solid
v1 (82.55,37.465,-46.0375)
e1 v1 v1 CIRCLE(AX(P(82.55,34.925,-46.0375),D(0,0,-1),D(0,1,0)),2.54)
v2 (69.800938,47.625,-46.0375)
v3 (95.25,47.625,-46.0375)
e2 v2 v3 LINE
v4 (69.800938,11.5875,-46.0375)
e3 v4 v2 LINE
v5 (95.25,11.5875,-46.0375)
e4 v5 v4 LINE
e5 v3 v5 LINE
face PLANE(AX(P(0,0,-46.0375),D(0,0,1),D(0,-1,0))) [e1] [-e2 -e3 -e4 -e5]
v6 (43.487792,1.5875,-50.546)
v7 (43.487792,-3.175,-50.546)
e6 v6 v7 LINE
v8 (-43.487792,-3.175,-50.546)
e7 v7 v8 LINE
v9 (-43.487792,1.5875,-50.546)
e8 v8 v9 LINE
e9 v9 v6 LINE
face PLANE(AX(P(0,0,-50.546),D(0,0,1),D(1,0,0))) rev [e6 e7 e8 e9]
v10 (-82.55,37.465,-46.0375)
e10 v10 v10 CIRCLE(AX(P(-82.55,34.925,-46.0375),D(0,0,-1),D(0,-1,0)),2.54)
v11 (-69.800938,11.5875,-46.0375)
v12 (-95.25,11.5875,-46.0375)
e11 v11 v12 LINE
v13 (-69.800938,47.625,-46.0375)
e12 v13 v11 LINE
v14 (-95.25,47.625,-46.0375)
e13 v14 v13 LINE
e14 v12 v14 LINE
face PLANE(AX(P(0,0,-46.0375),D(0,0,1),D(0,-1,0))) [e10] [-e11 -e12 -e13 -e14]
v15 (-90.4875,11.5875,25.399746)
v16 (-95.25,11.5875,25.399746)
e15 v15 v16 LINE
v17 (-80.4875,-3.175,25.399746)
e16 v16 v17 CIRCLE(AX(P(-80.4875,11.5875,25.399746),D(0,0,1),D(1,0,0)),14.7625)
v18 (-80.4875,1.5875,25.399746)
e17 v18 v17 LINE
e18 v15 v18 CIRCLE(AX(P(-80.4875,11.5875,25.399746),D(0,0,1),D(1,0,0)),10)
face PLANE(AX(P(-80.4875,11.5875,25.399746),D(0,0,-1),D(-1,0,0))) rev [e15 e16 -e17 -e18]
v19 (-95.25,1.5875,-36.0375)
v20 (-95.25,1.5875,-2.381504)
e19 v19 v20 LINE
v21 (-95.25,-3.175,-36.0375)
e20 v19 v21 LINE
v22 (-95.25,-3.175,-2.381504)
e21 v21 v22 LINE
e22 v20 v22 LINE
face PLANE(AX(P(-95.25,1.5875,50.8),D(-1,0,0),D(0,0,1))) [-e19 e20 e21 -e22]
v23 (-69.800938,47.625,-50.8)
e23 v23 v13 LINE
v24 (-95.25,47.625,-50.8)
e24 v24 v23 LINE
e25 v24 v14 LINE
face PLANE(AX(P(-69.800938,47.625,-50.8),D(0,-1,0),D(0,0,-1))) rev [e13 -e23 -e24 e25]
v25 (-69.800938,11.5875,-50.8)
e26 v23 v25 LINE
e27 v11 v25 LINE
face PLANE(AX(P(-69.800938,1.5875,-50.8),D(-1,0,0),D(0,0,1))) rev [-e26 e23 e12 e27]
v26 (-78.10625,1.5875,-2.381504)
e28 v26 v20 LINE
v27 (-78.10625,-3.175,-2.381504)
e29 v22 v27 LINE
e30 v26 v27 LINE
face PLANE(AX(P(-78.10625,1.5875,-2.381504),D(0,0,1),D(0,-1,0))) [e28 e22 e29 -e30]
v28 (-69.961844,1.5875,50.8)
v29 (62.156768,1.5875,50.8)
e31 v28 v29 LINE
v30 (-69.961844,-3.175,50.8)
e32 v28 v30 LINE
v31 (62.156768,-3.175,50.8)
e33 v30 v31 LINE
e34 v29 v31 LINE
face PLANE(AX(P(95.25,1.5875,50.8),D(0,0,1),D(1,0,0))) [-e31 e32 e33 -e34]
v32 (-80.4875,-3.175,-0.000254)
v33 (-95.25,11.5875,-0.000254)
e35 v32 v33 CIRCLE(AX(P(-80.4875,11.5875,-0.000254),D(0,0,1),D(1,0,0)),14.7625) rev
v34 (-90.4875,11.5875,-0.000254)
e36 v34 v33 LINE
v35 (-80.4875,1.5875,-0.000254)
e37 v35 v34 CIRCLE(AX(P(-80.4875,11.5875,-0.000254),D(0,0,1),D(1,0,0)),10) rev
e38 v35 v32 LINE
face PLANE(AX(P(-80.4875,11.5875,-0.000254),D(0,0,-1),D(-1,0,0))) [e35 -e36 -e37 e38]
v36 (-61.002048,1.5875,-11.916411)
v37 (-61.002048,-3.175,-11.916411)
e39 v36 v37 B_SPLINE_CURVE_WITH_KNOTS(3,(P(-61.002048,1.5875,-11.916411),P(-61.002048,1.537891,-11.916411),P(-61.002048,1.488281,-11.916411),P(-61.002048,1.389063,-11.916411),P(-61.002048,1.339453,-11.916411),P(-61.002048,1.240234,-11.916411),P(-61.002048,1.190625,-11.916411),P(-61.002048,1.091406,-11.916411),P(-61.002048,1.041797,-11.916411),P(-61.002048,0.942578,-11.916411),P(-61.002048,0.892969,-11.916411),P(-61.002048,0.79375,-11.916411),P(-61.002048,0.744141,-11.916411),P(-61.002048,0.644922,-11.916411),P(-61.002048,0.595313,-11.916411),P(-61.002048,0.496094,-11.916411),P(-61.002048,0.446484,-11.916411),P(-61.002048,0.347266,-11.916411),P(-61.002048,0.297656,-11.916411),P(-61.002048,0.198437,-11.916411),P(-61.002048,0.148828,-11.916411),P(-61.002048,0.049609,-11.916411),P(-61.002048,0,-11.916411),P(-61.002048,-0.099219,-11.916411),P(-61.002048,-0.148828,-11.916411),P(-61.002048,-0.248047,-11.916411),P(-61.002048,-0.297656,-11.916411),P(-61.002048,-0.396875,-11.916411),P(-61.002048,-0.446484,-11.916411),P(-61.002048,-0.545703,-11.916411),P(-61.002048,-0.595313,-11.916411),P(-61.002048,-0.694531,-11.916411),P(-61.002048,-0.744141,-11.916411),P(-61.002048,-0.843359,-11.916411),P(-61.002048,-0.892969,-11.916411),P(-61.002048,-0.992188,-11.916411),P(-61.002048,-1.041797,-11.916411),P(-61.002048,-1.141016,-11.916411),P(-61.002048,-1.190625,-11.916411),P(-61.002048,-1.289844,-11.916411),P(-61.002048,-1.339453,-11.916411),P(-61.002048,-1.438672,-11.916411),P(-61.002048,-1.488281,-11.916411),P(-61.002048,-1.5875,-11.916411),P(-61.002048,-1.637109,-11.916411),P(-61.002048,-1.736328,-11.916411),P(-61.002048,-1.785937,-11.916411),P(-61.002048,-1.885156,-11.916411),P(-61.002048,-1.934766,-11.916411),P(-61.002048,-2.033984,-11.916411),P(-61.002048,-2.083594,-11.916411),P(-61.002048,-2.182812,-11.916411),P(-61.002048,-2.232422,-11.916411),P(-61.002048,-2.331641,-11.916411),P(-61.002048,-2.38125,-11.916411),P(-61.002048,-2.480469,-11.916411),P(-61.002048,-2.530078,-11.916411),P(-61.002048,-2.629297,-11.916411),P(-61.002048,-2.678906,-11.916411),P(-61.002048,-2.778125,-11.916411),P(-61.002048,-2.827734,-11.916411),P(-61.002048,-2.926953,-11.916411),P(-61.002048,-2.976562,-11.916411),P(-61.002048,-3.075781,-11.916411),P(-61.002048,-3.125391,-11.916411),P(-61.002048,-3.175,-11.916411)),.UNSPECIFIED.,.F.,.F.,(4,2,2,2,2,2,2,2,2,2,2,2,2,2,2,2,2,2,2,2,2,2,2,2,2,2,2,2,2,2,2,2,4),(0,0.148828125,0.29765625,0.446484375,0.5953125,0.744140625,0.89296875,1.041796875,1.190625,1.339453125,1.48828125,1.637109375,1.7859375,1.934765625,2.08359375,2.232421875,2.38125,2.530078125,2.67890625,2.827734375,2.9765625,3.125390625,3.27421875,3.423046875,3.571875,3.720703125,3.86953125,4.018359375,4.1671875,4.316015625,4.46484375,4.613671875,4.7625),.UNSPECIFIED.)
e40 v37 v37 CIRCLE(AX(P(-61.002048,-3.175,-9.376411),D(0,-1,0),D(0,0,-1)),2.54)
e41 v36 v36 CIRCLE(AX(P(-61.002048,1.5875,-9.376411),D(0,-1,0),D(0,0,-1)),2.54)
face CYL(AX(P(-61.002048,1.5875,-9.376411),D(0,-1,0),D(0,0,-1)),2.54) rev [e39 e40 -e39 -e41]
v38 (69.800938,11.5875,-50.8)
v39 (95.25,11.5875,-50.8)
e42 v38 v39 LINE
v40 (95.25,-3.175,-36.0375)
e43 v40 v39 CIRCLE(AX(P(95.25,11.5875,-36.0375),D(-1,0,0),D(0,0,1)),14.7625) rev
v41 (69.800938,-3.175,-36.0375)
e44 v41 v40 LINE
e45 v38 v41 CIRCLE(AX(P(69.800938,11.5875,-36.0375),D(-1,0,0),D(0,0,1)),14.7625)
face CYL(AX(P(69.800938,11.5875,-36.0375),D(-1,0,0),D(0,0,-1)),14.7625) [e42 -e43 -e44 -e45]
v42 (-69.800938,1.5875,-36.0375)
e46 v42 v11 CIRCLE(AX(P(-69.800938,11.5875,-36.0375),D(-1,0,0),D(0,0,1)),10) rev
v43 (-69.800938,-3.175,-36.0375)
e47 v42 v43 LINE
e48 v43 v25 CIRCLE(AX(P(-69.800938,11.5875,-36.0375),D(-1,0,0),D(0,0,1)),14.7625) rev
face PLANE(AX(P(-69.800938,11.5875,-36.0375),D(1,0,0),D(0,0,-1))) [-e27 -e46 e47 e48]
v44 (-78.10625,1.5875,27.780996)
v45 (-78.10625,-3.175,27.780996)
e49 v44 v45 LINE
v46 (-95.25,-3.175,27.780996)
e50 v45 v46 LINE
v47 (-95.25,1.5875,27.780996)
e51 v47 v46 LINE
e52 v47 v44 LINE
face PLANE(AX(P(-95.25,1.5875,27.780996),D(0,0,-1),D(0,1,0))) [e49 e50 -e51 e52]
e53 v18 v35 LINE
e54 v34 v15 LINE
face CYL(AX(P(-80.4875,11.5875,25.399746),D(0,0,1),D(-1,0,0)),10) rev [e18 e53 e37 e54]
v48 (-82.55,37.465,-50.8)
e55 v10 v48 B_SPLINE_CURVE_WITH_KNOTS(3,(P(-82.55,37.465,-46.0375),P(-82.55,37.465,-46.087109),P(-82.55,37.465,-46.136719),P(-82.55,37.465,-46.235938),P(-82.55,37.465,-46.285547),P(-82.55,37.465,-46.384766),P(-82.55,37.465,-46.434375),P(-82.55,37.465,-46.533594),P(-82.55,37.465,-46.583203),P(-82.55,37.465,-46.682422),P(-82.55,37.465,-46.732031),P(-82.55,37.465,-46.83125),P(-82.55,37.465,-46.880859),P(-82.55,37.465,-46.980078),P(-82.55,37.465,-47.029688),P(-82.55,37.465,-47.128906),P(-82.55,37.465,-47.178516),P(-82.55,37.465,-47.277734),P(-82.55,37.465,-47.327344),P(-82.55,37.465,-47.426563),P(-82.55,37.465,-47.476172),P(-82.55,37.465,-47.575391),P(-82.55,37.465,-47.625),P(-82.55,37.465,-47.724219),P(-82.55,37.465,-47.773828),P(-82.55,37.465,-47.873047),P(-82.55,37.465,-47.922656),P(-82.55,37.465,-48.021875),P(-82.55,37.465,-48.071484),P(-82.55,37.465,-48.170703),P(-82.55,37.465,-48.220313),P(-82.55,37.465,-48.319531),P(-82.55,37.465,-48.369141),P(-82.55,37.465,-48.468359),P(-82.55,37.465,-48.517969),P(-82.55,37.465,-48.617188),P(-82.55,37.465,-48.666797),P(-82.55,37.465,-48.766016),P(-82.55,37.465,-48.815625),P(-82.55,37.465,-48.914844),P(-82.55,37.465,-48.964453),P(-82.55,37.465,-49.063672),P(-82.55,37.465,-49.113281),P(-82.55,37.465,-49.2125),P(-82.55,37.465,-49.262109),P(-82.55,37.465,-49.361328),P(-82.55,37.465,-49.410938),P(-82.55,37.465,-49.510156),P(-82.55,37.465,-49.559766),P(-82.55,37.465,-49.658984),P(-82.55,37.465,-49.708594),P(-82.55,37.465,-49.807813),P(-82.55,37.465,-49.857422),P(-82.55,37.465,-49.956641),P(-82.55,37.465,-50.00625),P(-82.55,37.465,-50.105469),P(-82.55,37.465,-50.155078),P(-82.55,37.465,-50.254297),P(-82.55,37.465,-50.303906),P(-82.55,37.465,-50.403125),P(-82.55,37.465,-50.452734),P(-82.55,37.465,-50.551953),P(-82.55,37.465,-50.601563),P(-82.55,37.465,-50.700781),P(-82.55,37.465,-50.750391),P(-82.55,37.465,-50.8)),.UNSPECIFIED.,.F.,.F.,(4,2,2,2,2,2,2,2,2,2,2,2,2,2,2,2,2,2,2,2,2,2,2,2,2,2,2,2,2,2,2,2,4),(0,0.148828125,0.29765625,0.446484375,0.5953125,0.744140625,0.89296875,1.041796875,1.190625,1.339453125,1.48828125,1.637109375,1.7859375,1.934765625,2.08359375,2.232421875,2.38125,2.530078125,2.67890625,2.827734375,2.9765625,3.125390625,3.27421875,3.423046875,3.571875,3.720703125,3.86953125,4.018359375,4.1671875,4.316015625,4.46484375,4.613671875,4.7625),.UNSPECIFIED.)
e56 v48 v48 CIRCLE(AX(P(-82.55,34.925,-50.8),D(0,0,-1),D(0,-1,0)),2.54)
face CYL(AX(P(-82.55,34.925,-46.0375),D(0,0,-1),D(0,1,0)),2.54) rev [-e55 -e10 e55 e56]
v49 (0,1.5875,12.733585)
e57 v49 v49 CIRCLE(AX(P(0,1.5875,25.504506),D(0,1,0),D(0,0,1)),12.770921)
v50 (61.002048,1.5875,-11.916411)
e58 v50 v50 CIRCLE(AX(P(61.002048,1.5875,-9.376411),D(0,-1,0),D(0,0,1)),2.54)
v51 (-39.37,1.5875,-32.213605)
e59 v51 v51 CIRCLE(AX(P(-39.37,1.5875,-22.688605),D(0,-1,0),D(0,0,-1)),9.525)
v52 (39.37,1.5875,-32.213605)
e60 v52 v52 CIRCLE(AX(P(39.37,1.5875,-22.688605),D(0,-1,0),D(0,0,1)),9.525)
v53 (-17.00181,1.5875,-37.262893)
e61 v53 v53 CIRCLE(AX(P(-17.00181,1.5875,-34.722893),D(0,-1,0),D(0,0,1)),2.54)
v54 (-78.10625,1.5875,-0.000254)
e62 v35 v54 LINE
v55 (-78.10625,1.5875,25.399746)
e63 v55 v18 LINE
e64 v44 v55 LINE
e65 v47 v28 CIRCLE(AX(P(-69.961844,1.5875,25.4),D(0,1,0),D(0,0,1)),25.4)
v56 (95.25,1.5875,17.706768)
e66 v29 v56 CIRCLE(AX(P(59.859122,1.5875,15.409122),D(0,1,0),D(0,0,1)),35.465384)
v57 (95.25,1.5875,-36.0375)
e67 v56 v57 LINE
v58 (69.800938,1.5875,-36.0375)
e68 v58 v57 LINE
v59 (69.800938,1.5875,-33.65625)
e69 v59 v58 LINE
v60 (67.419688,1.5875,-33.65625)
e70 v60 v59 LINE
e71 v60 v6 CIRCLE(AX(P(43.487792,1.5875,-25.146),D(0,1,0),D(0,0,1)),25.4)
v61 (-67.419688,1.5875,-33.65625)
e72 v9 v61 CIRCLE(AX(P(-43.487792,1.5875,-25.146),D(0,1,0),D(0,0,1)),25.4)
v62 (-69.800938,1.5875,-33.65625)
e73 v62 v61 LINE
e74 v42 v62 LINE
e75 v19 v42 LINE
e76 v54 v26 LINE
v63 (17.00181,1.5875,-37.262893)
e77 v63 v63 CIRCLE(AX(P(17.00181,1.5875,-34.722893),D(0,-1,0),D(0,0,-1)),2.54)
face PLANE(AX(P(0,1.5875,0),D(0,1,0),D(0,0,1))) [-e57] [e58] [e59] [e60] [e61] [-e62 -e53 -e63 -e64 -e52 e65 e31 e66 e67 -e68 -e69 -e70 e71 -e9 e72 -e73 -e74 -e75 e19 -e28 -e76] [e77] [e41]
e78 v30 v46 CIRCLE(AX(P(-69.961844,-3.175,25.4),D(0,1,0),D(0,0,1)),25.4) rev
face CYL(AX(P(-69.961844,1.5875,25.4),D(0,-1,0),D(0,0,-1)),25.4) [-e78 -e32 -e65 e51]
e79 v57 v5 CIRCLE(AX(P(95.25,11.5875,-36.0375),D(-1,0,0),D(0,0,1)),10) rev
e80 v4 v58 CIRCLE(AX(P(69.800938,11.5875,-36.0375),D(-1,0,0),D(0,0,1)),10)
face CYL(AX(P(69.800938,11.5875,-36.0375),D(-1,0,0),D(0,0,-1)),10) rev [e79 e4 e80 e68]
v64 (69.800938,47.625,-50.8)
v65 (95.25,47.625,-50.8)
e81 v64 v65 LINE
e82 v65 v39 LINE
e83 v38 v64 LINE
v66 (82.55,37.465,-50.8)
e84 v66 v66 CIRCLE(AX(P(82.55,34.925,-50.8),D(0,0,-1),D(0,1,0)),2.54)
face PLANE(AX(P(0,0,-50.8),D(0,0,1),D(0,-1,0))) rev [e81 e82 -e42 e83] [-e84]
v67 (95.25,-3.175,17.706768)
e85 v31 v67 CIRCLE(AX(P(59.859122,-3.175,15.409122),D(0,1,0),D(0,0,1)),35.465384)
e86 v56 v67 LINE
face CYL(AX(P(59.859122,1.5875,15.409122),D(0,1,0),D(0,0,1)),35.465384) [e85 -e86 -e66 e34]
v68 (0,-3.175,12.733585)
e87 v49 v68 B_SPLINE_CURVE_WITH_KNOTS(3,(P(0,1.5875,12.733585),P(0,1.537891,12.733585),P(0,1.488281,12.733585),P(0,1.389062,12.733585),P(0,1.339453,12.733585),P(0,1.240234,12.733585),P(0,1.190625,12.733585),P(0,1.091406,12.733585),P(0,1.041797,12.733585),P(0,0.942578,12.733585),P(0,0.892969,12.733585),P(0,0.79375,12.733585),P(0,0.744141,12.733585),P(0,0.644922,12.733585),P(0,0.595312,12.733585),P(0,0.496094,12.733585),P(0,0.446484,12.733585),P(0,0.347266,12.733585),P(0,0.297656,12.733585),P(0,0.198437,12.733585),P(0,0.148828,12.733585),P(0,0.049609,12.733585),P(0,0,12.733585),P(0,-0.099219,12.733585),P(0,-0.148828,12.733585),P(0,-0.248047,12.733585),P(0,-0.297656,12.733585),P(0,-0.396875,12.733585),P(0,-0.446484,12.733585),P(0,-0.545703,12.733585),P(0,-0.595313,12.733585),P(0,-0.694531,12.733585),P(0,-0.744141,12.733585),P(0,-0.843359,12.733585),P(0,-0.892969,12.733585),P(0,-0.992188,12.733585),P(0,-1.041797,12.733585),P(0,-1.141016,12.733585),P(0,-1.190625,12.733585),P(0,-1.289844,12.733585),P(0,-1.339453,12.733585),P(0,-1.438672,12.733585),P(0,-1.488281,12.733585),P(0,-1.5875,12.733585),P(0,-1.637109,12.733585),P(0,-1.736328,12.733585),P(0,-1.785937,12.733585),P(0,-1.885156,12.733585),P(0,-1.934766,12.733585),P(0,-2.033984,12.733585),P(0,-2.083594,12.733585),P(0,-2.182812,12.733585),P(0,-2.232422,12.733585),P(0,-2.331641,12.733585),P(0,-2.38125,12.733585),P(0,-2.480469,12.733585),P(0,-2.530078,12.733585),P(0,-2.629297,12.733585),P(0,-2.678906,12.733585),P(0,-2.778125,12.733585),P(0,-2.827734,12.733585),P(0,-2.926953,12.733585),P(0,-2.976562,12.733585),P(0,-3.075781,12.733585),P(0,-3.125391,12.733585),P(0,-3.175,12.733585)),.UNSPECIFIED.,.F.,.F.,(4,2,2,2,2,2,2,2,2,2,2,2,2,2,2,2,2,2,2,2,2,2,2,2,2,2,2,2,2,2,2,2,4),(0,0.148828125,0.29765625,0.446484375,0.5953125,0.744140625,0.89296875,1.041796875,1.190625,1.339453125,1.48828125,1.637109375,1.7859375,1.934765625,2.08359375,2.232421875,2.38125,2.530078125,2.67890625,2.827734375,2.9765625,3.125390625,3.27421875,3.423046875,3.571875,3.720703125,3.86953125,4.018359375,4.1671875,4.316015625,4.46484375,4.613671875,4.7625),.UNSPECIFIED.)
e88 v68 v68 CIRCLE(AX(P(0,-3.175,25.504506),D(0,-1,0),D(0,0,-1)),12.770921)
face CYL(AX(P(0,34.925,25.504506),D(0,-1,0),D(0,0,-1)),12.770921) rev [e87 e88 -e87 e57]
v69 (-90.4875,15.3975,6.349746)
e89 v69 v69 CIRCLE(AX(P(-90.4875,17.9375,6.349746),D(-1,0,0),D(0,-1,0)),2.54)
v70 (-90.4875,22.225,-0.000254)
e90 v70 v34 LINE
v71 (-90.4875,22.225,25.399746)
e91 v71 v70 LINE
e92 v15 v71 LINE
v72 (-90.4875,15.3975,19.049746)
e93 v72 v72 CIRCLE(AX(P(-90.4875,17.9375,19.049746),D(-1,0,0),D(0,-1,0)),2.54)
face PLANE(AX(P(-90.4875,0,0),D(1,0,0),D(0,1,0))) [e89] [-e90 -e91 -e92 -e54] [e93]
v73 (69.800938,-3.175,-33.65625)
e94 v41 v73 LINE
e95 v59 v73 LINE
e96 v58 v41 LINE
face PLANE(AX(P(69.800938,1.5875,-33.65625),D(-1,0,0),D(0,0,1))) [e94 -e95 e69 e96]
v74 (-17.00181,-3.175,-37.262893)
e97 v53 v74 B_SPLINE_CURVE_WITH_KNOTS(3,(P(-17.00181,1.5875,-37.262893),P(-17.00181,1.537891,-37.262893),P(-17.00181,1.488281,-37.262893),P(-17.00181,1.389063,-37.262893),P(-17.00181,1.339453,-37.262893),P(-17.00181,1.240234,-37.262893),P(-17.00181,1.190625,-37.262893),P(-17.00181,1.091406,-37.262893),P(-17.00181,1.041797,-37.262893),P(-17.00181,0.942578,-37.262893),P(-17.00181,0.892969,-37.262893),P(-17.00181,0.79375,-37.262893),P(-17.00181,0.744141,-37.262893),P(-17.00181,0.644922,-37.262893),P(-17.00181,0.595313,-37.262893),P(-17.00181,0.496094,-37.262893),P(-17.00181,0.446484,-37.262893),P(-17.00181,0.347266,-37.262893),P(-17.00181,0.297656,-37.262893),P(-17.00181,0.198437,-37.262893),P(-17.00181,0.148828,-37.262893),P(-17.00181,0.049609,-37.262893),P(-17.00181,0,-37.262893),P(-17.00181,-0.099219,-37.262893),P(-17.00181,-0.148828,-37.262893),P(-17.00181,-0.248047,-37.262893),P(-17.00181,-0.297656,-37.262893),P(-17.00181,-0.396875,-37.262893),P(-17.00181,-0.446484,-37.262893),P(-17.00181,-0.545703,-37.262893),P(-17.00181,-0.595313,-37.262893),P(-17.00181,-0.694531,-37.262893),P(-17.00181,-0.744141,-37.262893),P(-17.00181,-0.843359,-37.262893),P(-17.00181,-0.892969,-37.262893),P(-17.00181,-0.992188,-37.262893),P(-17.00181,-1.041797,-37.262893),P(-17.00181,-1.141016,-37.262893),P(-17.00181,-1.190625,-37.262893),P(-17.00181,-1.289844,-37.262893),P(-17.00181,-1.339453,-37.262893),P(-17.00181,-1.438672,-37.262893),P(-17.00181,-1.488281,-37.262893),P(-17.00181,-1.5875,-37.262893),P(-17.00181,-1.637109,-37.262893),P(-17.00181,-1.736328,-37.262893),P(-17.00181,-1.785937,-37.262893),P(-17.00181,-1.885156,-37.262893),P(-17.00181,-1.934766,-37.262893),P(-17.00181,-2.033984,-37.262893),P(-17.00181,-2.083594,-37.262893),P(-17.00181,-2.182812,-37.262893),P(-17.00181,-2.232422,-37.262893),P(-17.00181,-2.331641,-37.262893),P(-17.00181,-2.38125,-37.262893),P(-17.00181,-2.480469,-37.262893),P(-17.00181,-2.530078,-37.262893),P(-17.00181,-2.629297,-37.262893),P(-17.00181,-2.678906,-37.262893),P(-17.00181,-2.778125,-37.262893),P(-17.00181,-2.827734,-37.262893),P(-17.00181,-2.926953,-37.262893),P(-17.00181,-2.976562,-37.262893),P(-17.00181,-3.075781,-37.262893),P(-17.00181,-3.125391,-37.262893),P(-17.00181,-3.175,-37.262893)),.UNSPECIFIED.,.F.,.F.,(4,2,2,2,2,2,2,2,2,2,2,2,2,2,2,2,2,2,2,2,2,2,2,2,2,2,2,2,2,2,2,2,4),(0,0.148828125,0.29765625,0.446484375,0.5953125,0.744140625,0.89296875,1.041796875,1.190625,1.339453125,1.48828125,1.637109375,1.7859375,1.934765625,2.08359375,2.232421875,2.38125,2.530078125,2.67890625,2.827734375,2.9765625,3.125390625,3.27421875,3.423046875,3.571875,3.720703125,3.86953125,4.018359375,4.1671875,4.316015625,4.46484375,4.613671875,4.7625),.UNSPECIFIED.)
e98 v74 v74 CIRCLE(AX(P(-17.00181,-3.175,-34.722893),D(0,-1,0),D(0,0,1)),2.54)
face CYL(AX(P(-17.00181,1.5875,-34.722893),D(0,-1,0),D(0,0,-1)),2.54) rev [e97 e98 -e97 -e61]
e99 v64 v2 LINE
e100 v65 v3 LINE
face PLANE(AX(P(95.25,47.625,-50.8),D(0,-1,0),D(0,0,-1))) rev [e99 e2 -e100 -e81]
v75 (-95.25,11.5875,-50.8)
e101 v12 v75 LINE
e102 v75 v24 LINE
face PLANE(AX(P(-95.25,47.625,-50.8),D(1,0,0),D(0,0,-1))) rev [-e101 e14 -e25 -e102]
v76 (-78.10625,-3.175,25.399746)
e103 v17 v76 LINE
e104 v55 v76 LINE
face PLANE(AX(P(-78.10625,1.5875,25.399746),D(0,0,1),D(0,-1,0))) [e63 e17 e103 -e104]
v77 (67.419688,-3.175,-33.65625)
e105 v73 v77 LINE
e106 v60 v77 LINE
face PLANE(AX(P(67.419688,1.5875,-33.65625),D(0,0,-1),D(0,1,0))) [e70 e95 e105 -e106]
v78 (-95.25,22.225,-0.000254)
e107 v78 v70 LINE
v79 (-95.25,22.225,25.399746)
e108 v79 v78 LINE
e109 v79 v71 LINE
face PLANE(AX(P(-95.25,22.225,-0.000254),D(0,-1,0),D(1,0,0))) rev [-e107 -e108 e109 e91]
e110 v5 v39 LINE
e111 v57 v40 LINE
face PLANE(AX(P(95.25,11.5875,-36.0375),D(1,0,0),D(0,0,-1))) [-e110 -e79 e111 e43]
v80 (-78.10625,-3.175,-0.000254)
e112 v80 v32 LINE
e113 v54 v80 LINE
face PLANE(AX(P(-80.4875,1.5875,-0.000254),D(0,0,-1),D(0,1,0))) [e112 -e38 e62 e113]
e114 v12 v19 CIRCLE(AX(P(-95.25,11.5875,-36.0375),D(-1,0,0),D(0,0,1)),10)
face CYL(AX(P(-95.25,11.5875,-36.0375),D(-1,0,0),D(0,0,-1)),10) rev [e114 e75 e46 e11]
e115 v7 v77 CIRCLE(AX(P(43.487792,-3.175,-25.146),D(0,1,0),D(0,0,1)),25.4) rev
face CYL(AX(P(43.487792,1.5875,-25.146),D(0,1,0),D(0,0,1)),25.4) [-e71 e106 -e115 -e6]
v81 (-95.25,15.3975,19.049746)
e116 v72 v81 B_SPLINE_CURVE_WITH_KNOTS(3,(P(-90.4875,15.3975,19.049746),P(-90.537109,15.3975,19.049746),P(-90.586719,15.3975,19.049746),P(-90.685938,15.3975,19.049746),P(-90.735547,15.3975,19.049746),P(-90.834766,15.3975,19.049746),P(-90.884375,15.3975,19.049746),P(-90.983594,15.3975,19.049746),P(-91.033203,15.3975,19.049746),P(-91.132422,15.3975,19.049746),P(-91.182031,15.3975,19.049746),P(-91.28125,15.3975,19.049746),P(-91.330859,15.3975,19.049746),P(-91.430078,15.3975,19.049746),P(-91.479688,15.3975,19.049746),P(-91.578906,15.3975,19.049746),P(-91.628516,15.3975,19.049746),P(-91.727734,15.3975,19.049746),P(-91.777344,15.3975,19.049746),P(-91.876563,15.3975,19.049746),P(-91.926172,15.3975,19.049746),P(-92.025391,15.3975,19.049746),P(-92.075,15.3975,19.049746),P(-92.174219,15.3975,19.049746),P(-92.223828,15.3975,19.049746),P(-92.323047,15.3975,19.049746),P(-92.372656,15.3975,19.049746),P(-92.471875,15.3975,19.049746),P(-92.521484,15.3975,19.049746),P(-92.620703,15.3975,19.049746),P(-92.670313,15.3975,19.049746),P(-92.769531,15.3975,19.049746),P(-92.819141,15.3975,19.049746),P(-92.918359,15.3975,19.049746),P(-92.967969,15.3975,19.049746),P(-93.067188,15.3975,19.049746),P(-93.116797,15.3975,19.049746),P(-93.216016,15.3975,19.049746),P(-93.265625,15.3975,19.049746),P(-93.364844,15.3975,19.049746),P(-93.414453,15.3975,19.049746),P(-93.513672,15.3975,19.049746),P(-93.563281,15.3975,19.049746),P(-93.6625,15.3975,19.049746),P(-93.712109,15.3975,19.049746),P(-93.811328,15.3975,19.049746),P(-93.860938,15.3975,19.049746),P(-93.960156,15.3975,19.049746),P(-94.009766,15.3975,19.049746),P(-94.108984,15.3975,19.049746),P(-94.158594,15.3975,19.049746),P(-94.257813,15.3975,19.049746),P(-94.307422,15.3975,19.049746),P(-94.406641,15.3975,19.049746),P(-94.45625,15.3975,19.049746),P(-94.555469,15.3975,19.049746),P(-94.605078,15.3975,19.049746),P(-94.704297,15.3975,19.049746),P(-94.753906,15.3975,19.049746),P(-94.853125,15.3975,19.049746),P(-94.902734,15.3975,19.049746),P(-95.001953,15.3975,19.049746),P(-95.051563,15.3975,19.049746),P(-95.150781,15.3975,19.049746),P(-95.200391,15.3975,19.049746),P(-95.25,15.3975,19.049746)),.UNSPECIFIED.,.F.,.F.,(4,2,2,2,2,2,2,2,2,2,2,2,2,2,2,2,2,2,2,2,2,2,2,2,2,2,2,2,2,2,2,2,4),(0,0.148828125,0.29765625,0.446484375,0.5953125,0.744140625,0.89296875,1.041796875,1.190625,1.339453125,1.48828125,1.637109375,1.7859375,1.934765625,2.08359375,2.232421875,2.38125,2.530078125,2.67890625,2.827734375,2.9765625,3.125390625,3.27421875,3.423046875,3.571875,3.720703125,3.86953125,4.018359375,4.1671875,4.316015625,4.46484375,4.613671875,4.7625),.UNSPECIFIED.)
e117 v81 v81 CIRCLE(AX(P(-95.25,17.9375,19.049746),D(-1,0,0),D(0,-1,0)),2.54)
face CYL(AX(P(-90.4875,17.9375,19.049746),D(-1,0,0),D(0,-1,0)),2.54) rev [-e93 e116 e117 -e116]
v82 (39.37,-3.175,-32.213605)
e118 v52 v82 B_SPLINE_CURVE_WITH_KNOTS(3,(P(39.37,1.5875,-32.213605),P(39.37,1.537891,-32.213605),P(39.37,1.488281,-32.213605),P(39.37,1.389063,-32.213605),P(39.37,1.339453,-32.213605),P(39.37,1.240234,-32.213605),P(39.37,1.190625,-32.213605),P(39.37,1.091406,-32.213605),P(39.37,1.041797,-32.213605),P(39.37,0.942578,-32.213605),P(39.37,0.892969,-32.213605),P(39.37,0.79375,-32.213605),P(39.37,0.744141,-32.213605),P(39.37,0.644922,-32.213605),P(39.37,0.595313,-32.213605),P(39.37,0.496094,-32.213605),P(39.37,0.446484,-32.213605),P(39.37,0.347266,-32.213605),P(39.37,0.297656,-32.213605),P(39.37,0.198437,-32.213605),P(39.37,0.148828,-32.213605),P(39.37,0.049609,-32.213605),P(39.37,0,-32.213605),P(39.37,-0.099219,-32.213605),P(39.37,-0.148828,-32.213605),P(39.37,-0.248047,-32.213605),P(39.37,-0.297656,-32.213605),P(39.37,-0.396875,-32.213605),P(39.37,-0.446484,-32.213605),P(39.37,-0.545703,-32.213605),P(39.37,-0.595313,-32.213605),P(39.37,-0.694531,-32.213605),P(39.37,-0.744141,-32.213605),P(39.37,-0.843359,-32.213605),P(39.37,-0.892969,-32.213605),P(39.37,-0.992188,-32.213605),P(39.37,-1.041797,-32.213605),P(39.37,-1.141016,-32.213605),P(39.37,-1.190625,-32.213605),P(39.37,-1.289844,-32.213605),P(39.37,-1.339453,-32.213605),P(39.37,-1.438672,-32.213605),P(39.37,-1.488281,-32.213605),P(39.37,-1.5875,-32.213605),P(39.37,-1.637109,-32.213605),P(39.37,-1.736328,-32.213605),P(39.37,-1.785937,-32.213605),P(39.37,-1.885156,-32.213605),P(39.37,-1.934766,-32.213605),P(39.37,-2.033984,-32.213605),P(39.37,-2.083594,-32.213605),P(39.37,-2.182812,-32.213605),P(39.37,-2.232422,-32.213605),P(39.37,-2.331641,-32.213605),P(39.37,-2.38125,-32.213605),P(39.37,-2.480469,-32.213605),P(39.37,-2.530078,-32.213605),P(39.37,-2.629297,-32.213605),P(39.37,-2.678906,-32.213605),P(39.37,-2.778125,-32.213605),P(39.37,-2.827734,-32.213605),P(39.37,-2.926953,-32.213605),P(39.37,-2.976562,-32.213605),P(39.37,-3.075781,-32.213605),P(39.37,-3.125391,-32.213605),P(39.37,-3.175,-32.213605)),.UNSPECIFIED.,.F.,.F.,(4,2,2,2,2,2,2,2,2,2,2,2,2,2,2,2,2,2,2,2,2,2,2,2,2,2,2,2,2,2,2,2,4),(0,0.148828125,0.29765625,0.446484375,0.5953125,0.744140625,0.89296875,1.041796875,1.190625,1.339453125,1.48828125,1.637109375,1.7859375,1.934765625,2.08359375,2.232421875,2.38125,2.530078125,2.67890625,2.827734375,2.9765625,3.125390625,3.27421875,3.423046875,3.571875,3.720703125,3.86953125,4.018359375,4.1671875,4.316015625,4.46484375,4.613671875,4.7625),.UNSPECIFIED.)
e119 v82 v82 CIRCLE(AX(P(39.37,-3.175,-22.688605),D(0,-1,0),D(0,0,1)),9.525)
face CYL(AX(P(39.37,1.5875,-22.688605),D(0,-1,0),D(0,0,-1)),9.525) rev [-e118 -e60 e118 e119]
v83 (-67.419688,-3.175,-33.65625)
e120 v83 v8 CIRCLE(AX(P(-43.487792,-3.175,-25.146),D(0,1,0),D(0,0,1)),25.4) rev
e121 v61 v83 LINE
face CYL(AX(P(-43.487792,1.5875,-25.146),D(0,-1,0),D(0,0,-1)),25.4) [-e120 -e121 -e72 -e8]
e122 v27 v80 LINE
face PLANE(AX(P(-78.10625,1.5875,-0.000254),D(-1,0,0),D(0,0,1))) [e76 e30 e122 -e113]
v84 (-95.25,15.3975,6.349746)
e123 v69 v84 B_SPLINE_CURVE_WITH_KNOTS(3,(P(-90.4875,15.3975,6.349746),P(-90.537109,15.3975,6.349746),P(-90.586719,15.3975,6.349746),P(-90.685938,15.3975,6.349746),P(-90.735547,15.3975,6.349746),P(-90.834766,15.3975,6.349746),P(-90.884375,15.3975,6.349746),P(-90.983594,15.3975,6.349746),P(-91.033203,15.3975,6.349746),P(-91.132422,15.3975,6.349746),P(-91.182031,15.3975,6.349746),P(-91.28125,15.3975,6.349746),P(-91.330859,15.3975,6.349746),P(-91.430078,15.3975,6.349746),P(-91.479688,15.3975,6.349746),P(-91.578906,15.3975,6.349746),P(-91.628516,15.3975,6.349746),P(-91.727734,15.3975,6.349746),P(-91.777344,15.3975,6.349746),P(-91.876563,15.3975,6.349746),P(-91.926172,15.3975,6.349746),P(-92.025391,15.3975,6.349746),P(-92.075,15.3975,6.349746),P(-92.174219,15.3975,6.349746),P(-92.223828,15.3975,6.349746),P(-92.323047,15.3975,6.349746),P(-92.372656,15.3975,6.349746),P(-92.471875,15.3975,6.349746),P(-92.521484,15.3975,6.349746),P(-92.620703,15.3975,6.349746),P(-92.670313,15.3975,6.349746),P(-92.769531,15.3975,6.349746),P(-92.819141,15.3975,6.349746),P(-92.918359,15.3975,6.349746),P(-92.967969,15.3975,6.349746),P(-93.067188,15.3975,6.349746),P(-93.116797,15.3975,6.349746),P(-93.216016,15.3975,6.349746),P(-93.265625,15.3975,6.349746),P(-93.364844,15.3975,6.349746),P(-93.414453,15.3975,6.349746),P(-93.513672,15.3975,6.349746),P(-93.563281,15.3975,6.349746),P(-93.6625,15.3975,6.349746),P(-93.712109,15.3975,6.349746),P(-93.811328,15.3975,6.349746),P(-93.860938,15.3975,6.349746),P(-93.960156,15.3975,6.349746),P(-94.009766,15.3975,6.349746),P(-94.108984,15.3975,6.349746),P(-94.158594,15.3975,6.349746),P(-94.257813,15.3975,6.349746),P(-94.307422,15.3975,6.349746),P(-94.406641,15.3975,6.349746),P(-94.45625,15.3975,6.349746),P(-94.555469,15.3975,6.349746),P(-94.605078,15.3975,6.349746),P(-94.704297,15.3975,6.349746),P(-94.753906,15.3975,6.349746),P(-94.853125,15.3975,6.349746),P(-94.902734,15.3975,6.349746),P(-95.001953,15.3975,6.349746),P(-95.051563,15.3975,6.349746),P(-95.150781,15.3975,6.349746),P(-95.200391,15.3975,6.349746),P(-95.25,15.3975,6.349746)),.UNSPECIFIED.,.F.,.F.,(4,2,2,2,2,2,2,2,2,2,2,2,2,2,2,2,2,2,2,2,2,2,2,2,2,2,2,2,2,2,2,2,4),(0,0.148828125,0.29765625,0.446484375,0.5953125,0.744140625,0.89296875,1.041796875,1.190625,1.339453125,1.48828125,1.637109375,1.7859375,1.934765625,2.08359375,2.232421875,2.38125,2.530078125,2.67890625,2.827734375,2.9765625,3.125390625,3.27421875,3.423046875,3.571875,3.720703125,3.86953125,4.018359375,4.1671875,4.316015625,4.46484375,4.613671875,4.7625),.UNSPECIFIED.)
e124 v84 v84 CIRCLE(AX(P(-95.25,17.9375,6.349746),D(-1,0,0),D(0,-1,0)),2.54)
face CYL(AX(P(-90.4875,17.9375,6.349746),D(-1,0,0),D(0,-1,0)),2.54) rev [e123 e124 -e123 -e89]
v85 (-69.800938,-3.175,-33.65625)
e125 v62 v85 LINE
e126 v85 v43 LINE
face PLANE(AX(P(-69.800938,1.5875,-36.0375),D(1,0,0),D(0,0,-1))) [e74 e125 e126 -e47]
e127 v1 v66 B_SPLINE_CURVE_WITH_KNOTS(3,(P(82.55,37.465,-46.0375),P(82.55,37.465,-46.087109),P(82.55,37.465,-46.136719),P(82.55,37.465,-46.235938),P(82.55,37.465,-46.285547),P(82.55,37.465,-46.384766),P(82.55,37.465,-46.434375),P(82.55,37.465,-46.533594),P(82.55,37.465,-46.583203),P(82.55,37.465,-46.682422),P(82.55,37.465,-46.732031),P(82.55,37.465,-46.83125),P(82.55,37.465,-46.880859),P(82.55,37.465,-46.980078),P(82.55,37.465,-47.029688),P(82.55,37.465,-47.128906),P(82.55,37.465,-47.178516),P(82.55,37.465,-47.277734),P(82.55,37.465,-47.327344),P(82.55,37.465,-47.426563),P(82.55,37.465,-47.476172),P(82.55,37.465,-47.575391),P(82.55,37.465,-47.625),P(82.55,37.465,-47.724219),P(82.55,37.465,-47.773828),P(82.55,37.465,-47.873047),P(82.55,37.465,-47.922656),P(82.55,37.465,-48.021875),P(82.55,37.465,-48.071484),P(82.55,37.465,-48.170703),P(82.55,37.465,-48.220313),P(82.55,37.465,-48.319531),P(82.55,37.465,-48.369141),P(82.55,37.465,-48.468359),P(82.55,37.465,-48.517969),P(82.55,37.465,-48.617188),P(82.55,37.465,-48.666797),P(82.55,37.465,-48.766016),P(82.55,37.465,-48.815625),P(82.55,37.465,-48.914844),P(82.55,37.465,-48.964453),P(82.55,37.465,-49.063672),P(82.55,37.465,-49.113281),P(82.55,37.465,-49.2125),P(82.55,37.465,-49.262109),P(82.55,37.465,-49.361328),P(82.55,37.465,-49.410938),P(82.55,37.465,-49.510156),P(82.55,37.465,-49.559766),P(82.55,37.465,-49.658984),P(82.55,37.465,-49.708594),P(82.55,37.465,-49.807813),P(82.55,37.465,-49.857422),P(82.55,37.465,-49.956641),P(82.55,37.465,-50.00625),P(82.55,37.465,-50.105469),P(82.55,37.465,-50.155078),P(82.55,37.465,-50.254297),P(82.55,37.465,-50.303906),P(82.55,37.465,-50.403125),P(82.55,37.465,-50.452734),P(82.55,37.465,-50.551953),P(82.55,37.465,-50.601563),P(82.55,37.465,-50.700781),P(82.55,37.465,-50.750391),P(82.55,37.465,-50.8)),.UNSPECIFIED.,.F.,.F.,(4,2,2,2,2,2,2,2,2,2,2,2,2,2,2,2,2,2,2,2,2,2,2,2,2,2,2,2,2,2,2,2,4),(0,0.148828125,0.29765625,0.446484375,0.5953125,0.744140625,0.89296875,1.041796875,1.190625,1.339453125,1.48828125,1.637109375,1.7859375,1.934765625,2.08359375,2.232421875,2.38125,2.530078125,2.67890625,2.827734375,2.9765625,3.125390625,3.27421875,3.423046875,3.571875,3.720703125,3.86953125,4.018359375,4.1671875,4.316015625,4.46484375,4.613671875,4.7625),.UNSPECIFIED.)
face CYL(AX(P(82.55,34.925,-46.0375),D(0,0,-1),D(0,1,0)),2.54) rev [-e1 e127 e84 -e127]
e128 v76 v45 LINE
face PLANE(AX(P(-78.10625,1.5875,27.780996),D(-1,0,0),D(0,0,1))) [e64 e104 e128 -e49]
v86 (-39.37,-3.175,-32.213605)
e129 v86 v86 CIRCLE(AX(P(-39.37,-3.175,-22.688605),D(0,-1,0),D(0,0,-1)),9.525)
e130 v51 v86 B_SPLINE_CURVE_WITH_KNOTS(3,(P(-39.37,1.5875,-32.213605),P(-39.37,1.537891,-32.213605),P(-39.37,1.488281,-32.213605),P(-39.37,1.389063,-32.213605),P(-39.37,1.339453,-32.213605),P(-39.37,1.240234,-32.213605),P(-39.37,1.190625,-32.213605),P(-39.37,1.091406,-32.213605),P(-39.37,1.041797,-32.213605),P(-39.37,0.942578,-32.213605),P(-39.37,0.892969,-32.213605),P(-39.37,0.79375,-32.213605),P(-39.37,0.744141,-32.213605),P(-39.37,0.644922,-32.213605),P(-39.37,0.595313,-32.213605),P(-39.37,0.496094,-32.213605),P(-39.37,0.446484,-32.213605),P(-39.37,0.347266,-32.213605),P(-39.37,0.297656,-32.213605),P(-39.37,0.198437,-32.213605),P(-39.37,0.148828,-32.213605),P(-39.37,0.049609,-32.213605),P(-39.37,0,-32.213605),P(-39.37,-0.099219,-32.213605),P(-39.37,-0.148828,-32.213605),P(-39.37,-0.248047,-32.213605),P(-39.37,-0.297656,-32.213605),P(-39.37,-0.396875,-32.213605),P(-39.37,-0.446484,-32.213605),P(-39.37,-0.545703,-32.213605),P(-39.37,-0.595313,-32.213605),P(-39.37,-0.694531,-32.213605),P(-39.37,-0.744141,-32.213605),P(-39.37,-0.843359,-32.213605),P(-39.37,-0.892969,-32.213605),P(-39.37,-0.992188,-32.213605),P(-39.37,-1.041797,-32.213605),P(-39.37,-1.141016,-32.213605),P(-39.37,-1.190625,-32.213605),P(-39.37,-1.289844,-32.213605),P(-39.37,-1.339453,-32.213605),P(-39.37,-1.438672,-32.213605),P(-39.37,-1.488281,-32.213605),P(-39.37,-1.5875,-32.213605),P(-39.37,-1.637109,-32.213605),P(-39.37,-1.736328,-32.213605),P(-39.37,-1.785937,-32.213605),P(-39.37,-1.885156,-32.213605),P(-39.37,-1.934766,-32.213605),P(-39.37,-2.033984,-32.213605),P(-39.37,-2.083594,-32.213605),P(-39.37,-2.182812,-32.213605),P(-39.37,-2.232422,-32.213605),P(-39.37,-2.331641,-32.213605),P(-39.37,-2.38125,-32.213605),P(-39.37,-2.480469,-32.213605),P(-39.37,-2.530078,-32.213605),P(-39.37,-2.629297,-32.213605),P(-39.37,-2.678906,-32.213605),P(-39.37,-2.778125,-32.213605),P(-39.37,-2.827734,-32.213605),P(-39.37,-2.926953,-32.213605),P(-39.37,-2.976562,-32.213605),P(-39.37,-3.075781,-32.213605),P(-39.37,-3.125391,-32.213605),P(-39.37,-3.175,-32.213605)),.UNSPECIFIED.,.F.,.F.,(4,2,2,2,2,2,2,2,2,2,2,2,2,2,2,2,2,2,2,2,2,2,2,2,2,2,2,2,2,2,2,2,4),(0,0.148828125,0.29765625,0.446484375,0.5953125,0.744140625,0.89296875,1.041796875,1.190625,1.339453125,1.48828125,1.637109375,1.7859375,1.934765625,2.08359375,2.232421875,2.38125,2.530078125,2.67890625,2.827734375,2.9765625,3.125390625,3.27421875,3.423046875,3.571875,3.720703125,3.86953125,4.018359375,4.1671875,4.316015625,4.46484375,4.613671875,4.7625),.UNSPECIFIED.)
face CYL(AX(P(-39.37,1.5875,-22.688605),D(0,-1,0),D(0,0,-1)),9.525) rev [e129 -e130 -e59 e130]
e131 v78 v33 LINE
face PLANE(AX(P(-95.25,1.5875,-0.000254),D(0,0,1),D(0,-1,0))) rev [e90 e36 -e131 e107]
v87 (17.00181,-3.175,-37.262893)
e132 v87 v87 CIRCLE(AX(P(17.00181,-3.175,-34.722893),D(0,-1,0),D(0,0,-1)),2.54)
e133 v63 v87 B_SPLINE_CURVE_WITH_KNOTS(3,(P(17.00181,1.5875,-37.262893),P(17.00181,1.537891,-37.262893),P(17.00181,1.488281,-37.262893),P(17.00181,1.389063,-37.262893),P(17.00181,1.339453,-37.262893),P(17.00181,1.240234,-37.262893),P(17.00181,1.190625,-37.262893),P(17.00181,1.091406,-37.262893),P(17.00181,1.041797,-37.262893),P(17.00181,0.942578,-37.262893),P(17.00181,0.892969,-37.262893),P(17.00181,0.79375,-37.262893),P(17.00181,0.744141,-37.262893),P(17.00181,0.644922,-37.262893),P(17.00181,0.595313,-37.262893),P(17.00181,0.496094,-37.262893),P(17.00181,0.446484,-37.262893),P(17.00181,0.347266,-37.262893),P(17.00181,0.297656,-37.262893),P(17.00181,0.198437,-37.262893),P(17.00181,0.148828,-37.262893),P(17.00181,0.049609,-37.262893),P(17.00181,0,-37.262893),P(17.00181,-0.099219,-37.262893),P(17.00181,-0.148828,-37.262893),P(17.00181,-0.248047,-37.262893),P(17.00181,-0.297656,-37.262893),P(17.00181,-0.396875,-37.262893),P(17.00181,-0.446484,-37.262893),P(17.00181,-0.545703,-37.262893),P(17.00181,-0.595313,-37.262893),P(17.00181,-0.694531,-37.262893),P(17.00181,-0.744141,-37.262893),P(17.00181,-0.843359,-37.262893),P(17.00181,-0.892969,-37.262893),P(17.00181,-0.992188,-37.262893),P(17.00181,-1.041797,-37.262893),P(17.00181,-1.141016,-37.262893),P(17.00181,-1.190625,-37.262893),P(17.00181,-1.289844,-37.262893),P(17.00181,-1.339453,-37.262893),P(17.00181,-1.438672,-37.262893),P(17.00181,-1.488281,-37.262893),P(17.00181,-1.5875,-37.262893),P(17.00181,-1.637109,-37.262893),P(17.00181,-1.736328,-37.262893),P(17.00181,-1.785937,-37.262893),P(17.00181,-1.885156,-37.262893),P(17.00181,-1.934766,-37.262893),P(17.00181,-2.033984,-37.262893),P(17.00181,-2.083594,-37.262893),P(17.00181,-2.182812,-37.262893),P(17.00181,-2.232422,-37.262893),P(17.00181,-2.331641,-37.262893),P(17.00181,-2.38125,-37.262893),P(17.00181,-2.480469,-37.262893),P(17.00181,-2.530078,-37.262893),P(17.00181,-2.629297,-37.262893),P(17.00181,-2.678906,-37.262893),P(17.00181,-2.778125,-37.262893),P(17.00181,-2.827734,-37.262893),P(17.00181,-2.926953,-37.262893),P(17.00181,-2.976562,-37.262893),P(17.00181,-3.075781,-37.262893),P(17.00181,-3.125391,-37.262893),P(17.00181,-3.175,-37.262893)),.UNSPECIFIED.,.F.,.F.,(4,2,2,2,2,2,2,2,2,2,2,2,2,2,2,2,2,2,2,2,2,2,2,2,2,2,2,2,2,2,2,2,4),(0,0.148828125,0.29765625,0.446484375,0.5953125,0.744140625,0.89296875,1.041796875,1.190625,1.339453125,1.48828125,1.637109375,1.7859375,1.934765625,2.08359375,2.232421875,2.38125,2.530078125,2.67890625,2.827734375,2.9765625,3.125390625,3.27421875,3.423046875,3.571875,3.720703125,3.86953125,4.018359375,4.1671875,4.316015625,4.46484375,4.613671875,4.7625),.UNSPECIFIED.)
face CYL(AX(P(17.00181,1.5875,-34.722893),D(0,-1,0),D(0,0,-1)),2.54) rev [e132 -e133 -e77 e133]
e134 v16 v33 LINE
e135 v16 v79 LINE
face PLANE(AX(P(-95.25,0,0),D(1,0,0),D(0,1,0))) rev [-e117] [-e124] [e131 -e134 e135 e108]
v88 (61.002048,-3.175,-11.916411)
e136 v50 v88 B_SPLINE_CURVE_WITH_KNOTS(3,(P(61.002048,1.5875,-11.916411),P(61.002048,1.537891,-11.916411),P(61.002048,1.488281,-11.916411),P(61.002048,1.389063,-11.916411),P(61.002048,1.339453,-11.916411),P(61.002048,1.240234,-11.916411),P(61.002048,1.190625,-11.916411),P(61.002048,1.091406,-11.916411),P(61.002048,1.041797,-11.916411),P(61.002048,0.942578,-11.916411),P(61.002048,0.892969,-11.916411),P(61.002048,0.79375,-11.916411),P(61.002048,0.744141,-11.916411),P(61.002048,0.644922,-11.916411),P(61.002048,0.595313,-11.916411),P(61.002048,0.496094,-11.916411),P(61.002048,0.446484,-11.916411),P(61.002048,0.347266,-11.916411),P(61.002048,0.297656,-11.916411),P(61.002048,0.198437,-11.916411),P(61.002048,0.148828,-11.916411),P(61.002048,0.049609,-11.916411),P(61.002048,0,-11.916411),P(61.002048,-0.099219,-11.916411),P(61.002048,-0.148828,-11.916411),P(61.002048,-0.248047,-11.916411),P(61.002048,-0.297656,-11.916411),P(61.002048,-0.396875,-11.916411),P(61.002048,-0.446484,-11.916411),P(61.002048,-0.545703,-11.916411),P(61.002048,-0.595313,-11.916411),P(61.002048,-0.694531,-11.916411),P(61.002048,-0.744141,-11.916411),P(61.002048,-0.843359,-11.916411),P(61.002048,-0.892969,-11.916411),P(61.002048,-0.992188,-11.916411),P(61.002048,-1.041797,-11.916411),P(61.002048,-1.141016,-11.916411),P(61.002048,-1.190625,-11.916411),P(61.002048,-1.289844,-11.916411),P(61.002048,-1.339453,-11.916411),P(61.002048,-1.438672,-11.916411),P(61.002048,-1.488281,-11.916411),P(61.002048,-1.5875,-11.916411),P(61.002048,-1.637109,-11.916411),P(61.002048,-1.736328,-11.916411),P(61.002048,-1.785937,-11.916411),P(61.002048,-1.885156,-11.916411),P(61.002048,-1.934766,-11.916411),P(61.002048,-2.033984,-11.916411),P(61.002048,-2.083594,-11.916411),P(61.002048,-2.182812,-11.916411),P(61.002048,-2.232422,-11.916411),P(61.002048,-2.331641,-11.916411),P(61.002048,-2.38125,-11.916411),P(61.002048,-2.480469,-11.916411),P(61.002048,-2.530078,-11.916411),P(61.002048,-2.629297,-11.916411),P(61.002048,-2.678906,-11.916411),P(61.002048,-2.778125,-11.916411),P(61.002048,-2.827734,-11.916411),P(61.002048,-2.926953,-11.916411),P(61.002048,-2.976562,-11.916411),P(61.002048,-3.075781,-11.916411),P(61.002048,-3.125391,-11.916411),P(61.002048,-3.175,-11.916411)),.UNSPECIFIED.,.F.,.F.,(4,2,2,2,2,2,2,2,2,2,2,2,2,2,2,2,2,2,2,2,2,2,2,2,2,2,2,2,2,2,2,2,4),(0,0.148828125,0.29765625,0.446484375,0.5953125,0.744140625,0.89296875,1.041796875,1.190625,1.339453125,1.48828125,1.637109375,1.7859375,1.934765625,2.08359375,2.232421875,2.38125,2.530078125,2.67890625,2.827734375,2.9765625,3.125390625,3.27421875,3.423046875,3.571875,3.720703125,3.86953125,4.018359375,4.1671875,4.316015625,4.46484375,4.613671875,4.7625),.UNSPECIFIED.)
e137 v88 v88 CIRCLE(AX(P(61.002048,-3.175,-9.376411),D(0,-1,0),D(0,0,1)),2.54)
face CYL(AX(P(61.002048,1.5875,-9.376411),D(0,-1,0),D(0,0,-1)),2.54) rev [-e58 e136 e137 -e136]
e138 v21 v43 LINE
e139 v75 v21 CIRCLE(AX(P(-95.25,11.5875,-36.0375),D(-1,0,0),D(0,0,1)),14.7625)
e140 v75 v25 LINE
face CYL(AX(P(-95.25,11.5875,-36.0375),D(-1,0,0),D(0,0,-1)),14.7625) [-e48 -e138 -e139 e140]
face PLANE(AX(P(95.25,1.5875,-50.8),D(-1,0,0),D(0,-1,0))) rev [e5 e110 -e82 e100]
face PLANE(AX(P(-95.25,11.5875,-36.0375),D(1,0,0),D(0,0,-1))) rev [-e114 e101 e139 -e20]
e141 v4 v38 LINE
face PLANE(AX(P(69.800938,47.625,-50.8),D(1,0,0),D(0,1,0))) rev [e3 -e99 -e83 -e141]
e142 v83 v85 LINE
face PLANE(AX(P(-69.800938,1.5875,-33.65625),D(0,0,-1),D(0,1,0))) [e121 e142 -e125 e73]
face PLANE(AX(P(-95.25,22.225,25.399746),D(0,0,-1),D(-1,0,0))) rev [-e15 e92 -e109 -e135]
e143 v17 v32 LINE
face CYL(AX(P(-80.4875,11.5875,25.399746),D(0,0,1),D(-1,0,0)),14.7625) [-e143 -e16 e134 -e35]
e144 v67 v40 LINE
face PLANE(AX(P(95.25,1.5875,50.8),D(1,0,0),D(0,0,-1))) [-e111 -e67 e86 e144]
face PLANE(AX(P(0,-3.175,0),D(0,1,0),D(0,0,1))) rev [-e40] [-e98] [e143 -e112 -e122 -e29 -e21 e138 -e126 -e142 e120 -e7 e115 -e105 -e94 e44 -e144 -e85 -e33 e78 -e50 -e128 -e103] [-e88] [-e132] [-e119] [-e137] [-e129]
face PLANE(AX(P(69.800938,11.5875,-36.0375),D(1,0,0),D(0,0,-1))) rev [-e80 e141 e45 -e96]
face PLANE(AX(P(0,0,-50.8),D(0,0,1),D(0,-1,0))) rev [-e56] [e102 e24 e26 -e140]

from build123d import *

# Parameters (mm, degrees)
SKETCH1_W                     = 190.5
SKETCH1_H                     = 101.6
BOSS_EXTRUDE1_DEPTH           = 1.5875
CONVERT_SOLID1_START          = -95.25
CONVERT_SOLID1_OUTLINE_W      = 3.175
CONVERT_SOLID1_OUTLINE_H      = 101.6
CONVERT_SOLID1_DEPTH          = 190.5
SKETCH30_R                    = 12.770921212
CUT_EXTRUDE6_DEPTH            = 38.1
SKETCH35_W                    = 139.601875342
SKETCH35_H                    = 6.35
CUT_EXTRUDE7_DEPTH            = 0.254
EDGE_FLANGE1_STRIP_W          = 39.05
EDGE_FLANGE1_STRIP_H          = 4.7625
EDGE_FLANGE1_STRIP_CUT_DEPTH  = 25.449062329
EDGE_FLANGE1_RELIEF_W         = 41.43125
EDGE_FLANGE1_RELIEF_H         = 2.38125
EDGE_FLANGE1_RELIEF_CUT_DEPTH = 4.7625
EDGE_FLANGE1_DEPTH            = 25.449062329
EDGE_FLANGE2_STRIP_W          = 39.05
EDGE_FLANGE2_STRIP_H          = 4.7625
EDGE_FLANGE2_STRIP_CUT_DEPTH  = 25.449062329
EDGE_FLANGE2_RELIEF_W         = 41.43125
EDGE_FLANGE2_RELIEF_H         = 2.38125
EDGE_FLANGE2_RELIEF_CUT_DEPTH = 4.7625
EDGE_FLANGE2_DEPTH            = 25.449062329
SKETCH45_W                    = 4.7625
SKETCH45_H                    = 0.000254
CUT_EXTRUDE10_DEPTH           = 25.4
EDGE_FLANGE4_STRIP_W          = 39.05
EDGE_FLANGE4_STRIP_H          = 4.7625
EDGE_FLANGE4_STRIP_CUT_DEPTH  = 25.4
EDGE_FLANGE4_RELIEF_W         = 41.43125
EDGE_FLANGE4_RELIEF_H         = 2.38125
EDGE_FLANGE4_RELIEF_CUT_DEPTH = 4.7625
EDGE_FLANGE4_DEPTH            = 25.4
FILLET9_R                     = 25.4
CUT_EXTRUDE11_DEPTH           = 25.4
FILLET10_R                    = 25.4
SKETCH53_R                    = 2.54
CUT_EXTRUDE12_DEPTH           = 4.7625
SKETCH54_R                    = 2.54
CUT_EXTRUDE13_DEPTH           = 4.7625
SKETCH55_R                    = 9.525
SKETCH55_R_2                  = 2.54
CUT_EXTRUDE14_DEPTH           = 4.7625


# Read off the part's stored shape, not the designer's step: Convert-Solid1
# Sheet-metal steps are written as plain solids
with BuildPart() as part:
    # Sketch1 → Boss-Extrude1 (new body)
    with BuildSketch(Plane(origin=(0, 0, 0), x_dir=(1, 0, 0), z_dir=(0, 1, 0))):
        Rectangle(SKETCH1_W, SKETCH1_H)
    extrude(amount=BOSS_EXTRUDE1_DEPTH)

    # Convert-Solid1 outline → Convert-Solid1 (add)
    with BuildSketch(Plane.YZ.offset(CONVERT_SOLID1_START)):
        with Locations((-1.5875, 0)):
            Rectangle(CONVERT_SOLID1_OUTLINE_W, CONVERT_SOLID1_OUTLINE_H)
    extrude(amount=CONVERT_SOLID1_DEPTH)

    # Sketch30 → Cut-Extrude6 (cut)
    with BuildSketch(Plane(origin=(0, -3.175, 0), x_dir=(-1, 0, 0), z_dir=(0, -1, 0))):
        with Locations(Location((0, -25.504506424, 0), (0, 0, 90))):
            Circle(SKETCH30_R)
    extrude(amount=-CUT_EXTRUDE6_DEPTH, mode=Mode.SUBTRACT)

    # Sketch35 → Cut-Extrude7 (cut)
    with BuildSketch(Plane(origin=(0, 0, -50.8), x_dir=(-1, 0, 0), z_dir=(0, 0, -1))):
        Rectangle(SKETCH35_W, SKETCH35_H)
    extrude(amount=-CUT_EXTRUDE7_DEPTH, mode=Mode.SUBTRACT)

    # Edge-Flange1 strip (across the edge) → Edge-Flange1 strip cut (cut)
    with BuildSketch(Plane(origin=(95.25, 1.5875, -50.8), x_dir=(0, 0, 1), z_dir=(-1, 0, 0))):
        with Locations((-4.7625, -2.38125)):
            Rectangle(EDGE_FLANGE1_STRIP_W, EDGE_FLANGE1_STRIP_H)
    extrude(amount=EDGE_FLANGE1_STRIP_CUT_DEPTH, mode=Mode.SUBTRACT)

    # Edge-Flange1 relief (on the sheet) → Edge-Flange1 relief cut (cut)
    with BuildSketch(Plane(origin=(95.25, 1.5875, -36.0375), x_dir=(0, 0, 1), z_dir=(0, 1, 0))):
        with Locations((-18.334375, -26.639687329)):
            Rectangle(EDGE_FLANGE1_RELIEF_W, EDGE_FLANGE1_RELIEF_H)
    extrude(amount=-EDGE_FLANGE1_RELIEF_CUT_DEPTH, mode=Mode.SUBTRACT)

    # Edge-Flange1 section (across the edge) → Edge-Flange1 (add)
    with BuildSketch(Plane(origin=(95.25, 1.5875, -50.8), x_dir=(0, 0, 1), z_dir=(-1, 0, 0))):
        with BuildLine():
            Line((0, 10), (0, 46.0375))
            Line((0, 46.0375), (4.7625, 46.0375))
            Line((4.7625, 46.0375), (4.7625, 10))
            ThreePointArc((4.7625, 10), (7.691432188, 2.928932188), (14.7625, 0))
            Line((14.7625, 0), (14.7625, -4.7625))
            ThreePointArc((14.7625, -4.7625), (4.323836143, -0.438663857), (0, 10))
        make_face()
    extrude(amount=EDGE_FLANGE1_DEPTH)

    # Edge-Flange2 strip (across the edge) → Edge-Flange2 strip cut (cut)
    with BuildSketch(Plane(origin=(-69.800937671, 1.5875, -50.8), x_dir=(0, 0, 1), z_dir=(-1, 0, 0))):
        with Locations((-4.7625, -2.38125)):
            Rectangle(EDGE_FLANGE2_STRIP_W, EDGE_FLANGE2_STRIP_H)
    extrude(amount=EDGE_FLANGE2_STRIP_CUT_DEPTH, mode=Mode.SUBTRACT)

    # Edge-Flange2 relief (on the sheet) → Edge-Flange2 relief cut (cut)
    with BuildSketch(Plane(origin=(-69.800937671, 1.5875, -36.0375), x_dir=(0, 0, 1), z_dir=(0, 1, 0))):
        with Locations((-18.334375, 1.190625)):
            Rectangle(EDGE_FLANGE2_RELIEF_W, EDGE_FLANGE2_RELIEF_H)
    extrude(amount=-EDGE_FLANGE2_RELIEF_CUT_DEPTH, mode=Mode.SUBTRACT)

    # Edge-Flange2 section (across the edge) → Edge-Flange2 (add)
    with BuildSketch(Plane(origin=(-69.800937671, 1.5875, -50.8), x_dir=(0, 0, 1), z_dir=(-1, 0, 0))):
        with BuildLine():
            Line((0, 10), (0, 46.0375))
            Line((0, 46.0375), (4.7625, 46.0375))
            Line((4.7625, 46.0375), (4.7625, 10))
            ThreePointArc((4.7625, 10), (7.691432188, 2.928932188), (14.7625, 0))
            Line((14.7625, 0), (14.7625, -4.7625))
            ThreePointArc((14.7625, -4.7625), (4.323836143, -0.438663857), (0, 10))
        make_face()
    extrude(amount=EDGE_FLANGE2_DEPTH)

    # Sketch45 → Cut-Extrude10 (cut)
    with BuildSketch(Plane(origin=(0, 1.5875, 0), x_dir=(1, 0, 0), z_dir=(0, 1, 0))):
        with Locations((-92.86875, -25.399873)):
            Rectangle(SKETCH45_W, SKETCH45_H)
        with Locations((-92.86875, 0.000381)):
            Rectangle(SKETCH45_W, SKETCH45_H)
    extrude(amount=-CUT_EXTRUDE10_DEPTH, mode=Mode.SUBTRACT)

    # Edge-Flange4 strip (across the edge) → Edge-Flange4 strip cut (cut)
    with BuildSketch(Plane(origin=(-95.25, 1.5875, -0.000254), x_dir=(1, 0, 0), z_dir=(0, 0, 1))):
        with Locations((-4.7625, -2.38125)):
            Rectangle(EDGE_FLANGE4_STRIP_W, EDGE_FLANGE4_STRIP_H)
    extrude(amount=EDGE_FLANGE4_STRIP_CUT_DEPTH, mode=Mode.SUBTRACT)

    # Edge-Flange4 relief (on the sheet) → Edge-Flange4 relief cut (cut)
    with BuildSketch(Plane(origin=(-80.4875, 1.5875, -0.000254), x_dir=(1, 0, 0), z_dir=(0, 1, 0))):
        with Locations((-18.334375, 1.190625)):
            Rectangle(EDGE_FLANGE4_RELIEF_W, EDGE_FLANGE4_RELIEF_H)
        with Locations((-18.334375, -26.590625)):
            Rectangle(EDGE_FLANGE4_RELIEF_W, EDGE_FLANGE4_RELIEF_H)
    extrude(amount=-EDGE_FLANGE4_RELIEF_CUT_DEPTH, mode=Mode.SUBTRACT)

    # Edge-Flange4 section (across the edge) → Edge-Flange4 (add)
    with BuildSketch(Plane(origin=(-95.25, 1.5875, -0.000254), x_dir=(1, 0, 0), z_dir=(0, 0, 1))):
        with BuildLine():
            Line((0, 10), (0, 20.6375))
            Line((0, 20.6375), (4.7625, 20.6375))
            Line((4.7625, 20.6375), (4.7625, 10))
            ThreePointArc((4.7625, 10), (7.691432188, 2.928932188), (14.7625, 0))
            Line((14.7625, 0), (14.7625, -4.7625))
            ThreePointArc((14.7625, -4.7625), (4.323836143, -0.438663857), (0, 10))
        make_face()
    extrude(amount=EDGE_FLANGE4_DEPTH)

    # Fillet9
    # the kernel refuses this fillet: 25.4 mm, written as the material it takes off along each edge
    with BuildSketch(Plane(origin=(-67.419687671, 61.417239936, -50.546), x_dir=(1, 0, 0), z_dir=(0, -1, 0))) as fillet9_piece_1:
        with BuildLine():
            CenterArc((23.931895975, 25.4), FILLET9_R, 199.575530564, 70.424469436)
            Line((0, 16.88975), (-0.478637919, 16.719545))
            ThreePointArc((-0.478637919, 16.719545), (-0.508, 8.444875), (-0.508, 0))
            Line((-0.508, 0), (0, -0.508))
            Line((0, -0.508), (23.931895975, -0.508))
            Line((23.931895975, -0.508), (23.931895975, 0))
        make_face()
    extrude(amount=124.421979873, mode=Mode.SUBTRACT)
    with BuildSketch(Plane(origin=(67.419687671, 61.417239936, -50.546), x_dir=(0, 0, 1), z_dir=(0, -1, 0))) as fillet9_piece_2:
        with BuildLine():
            CenterArc((25.4, 23.931895975), FILLET9_R, 180, 70.424469436)
            Line((0, 23.931895975), (-0.508, 23.931895975))
            Line((-0.508, 23.931895975), (-0.508, 0))
            Line((-0.508, 0), (0, -0.508))
            ThreePointArc((0, -0.508), (8.444875, -0.508), (16.719545, -0.478637919))
            Line((16.719545, -0.478637919), (16.88975, 0))
        make_face()
    extrude(amount=124.421979873, mode=Mode.SUBTRACT)

    # Sketch52 → Cut-Extrude11 (cut)
    with BuildSketch(Plane.XZ.offset(3.175)):
        with BuildLine():
            ThreePointArc((62.156767956, 50.8), (84.936935051, 40.486935051), (95.25, 17.706767956))
            Line((95.25, 17.706767956), (95.25, 50.8))
            Line((95.25, 50.8), (62.156767956, 50.8))
        make_face()
    extrude(amount=-CUT_EXTRUDE11_DEPTH, mode=Mode.SUBTRACT)

    # Fillet10
    # the kernel refuses this fillet: 25.4 mm, written as the material it takes off along each edge
    with BuildSketch(Plane(origin=(-95.25, 64.807891195, 50.8), x_dir=(1, 0, 0), z_dir=(0, -1, 0))) as fillet10_piece_1:
        with BuildLine():
            CenterArc((25.288156478, -25.4), FILLET10_R, 90, 84.621196501)
            Line((0, -23.019004), (-0.50576313, -22.97138408))
            ThreePointArc((-0.50576313, -22.97138408), (-0.508, -11.509502), (-0.508, 0))
            Line((-0.508, 0), (0, 0.508))
            Line((0, 0.508), (25.288156478, 0.508))
            Line((25.288156478, 0.508), (25.288156478, 0))
        make_face()
    extrude(amount=131.203282389, mode=Mode.SUBTRACT)

    # Sketch53 → Cut-Extrude12 (cut)
    with BuildSketch(Plane.ZY.offset(95.25)):
        with Locations(Location((6.349746, 17.9375, 0), (0, 0, 270))):
            Circle(SKETCH53_R)
        with Locations(Location((19.049746, 17.9375, 0), (0, 0, 270))):
            Circle(SKETCH53_R)
    extrude(amount=-CUT_EXTRUDE12_DEPTH, mode=Mode.SUBTRACT)

    # Sketch54 → Cut-Extrude13 (cut)
    with BuildSketch(Plane(origin=(0, 0, -50.8), x_dir=(-1, 0, 0), z_dir=(0, 0, -1))):
        with Locations(Location((-82.55, 34.925, 0), (0, 0, 90))):
            Circle(SKETCH54_R)
        with Locations(Location((82.55, 34.925, 0), (0, 0, 90))):
            Circle(SKETCH54_R)
    extrude(amount=-CUT_EXTRUDE13_DEPTH, mode=Mode.SUBTRACT)

    # Sketch55 → Cut-Extrude14 (cut)
    with BuildSketch(Plane.XZ.offset(3.175)):
        with Locations(Location((-39.37, -22.688605117, 0), (0, 0, 270))):
            Circle(SKETCH55_R)
        with Locations(Location((39.37, -22.688605117, 0), (0, 0, 270))):
            Circle(SKETCH55_R)
        with Locations(Location((-17.001810213, -34.722893033, 0), (0, 0, 270))):
            Circle(SKETCH55_R_2)
        with Locations(Location((-61.002047674, -9.376410953, 0), (0, 0, 270))):
            Circle(SKETCH55_R_2)
        with Locations(Location((61.002047674, -9.376410953, 0), (0, 0, 270))):
            Circle(SKETCH55_R_2)
        with Locations(Location((17.001810213, -34.722893033, 0), (0, 0, 270))):
            Circle(SKETCH55_R_2)
    extrude(amount=-CUT_EXTRUDE14_DEPTH, mode=Mode.SUBTRACT)


solid = part.part
